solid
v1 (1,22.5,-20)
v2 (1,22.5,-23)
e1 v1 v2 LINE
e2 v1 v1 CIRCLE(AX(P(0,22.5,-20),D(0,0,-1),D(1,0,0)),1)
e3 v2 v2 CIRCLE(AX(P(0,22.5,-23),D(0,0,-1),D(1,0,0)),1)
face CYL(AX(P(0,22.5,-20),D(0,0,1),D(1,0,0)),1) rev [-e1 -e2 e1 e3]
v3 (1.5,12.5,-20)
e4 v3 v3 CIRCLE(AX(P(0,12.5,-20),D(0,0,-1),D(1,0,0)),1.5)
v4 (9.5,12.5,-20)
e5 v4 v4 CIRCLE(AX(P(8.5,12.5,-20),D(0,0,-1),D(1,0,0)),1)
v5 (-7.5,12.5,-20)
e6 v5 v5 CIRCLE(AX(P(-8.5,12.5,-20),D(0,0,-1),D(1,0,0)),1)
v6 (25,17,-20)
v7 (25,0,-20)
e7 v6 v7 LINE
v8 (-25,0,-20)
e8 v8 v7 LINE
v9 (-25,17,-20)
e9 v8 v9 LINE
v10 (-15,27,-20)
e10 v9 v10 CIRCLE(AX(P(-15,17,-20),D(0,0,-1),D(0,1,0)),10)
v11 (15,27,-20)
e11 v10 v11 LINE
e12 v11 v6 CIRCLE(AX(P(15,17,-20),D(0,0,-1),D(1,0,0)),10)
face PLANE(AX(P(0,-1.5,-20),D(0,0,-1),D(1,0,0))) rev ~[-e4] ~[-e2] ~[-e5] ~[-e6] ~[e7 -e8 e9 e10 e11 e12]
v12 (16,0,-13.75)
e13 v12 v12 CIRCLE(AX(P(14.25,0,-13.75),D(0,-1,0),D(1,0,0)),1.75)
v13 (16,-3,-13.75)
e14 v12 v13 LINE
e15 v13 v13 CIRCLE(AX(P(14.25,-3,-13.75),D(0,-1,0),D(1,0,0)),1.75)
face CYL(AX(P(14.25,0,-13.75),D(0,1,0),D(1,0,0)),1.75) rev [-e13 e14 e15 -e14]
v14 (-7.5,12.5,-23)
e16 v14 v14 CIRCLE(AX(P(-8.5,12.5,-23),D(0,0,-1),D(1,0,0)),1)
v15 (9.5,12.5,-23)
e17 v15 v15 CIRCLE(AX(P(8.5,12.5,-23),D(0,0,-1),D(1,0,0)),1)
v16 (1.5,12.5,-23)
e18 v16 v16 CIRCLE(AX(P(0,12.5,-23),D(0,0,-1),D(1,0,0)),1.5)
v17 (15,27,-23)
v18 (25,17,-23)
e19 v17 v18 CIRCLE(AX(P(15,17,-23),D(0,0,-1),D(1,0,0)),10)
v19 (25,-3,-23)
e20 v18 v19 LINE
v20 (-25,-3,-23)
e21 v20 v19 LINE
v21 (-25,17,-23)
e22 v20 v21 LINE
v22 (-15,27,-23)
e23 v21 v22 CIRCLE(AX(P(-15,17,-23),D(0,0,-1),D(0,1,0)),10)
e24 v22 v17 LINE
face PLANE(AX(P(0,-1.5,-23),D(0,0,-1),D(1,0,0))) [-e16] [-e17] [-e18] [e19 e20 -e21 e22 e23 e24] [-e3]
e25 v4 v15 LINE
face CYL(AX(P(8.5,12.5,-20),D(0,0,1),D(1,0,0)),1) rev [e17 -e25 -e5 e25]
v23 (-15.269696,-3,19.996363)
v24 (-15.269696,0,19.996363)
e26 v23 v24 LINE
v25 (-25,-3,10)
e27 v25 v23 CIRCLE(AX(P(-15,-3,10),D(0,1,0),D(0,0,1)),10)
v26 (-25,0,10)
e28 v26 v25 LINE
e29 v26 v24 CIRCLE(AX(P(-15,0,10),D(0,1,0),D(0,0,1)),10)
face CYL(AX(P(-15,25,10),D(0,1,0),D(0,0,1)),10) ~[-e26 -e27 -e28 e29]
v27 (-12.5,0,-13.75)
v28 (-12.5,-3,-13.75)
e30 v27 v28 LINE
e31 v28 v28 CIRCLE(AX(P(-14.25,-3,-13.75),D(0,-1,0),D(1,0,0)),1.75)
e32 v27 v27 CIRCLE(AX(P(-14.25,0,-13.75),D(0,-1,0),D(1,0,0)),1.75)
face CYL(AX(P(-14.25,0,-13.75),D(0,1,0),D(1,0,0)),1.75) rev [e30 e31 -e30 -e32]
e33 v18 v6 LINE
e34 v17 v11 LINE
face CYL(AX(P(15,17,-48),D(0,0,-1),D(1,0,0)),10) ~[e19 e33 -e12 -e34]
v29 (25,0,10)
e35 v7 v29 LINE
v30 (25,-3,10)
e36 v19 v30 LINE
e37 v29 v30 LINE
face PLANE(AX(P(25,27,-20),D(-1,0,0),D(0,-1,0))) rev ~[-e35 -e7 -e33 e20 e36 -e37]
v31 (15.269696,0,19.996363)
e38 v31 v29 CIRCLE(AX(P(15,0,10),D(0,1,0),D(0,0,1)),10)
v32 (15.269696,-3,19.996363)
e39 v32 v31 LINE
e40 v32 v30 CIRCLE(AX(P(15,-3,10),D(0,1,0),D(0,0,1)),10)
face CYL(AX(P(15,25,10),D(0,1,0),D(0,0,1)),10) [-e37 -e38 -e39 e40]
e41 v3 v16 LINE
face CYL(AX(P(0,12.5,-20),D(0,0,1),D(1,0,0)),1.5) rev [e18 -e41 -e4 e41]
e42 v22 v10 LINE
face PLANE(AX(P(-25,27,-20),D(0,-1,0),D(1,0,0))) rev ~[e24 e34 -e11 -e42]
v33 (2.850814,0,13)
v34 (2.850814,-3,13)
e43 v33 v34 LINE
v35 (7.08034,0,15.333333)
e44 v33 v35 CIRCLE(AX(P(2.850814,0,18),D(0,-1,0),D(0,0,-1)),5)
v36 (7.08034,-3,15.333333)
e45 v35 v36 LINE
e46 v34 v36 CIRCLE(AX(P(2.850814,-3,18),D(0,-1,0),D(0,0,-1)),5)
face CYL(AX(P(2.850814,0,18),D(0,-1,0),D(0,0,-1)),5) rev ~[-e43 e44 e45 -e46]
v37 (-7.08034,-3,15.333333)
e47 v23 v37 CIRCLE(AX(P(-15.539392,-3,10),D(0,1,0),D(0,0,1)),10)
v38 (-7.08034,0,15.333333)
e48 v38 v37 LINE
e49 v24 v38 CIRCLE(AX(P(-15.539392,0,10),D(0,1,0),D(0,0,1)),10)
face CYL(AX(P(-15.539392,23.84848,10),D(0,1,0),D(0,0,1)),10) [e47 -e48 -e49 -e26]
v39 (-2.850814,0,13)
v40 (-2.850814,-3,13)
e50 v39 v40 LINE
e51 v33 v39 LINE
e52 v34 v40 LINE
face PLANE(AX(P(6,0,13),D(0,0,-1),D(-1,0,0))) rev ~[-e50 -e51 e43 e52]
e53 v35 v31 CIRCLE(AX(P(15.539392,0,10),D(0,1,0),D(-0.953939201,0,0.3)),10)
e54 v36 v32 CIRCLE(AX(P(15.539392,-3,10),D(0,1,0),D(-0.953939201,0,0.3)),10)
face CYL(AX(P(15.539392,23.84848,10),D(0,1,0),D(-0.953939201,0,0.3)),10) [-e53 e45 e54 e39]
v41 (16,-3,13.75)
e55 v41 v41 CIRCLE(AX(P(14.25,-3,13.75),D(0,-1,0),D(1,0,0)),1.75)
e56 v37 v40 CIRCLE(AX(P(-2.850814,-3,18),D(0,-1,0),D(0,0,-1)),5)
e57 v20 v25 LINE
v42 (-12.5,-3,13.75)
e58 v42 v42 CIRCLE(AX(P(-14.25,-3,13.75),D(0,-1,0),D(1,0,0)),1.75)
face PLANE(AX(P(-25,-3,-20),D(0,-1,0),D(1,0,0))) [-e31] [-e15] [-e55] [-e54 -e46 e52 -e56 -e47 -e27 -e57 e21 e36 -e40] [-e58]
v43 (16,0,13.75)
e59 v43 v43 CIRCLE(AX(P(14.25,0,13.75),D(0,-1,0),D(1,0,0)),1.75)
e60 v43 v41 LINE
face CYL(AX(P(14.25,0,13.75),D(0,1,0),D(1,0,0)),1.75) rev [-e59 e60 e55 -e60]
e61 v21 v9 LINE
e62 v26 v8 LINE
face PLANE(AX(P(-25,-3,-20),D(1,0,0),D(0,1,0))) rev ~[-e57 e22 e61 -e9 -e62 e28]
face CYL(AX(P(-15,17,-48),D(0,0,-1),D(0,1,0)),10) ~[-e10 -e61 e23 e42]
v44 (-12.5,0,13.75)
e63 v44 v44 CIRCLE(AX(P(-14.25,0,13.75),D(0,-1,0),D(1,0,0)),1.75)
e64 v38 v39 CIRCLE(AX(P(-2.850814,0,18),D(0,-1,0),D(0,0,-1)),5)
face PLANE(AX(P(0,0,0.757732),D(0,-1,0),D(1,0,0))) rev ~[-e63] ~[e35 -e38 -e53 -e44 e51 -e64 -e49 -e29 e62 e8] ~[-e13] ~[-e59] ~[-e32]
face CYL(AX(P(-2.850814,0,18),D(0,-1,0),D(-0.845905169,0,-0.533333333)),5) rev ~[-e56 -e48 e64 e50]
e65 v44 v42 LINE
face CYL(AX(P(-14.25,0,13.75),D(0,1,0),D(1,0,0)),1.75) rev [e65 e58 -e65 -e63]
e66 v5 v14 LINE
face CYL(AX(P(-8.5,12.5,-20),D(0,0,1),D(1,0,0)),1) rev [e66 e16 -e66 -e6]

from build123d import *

# Parameters (mm, degrees)
F0_R        = 1.75
F1_DEPTH    = 3
F2_W        = 50
F2_H        = 3
F2_H_2      = 27
F2_R        = 1
F2_R_2      = 1.5
F3_DEPTH    = 3
F4_T1_DEPTH = 53
F4_T3_DEPTH = 53
F4_T5_DEPTH = 50.6969600708
F5_R        = 5


# Not quite as in the source:
# - a fillet or chamfer that OpenCascade refuses, or shapes differently, is made with other operations: its cross-section is extruded or revolved along the edge and cut away or added


with BuildPart() as f1:
    # F0 (on Front) → F1 (new body)
    with BuildSketch(Plane.XZ):
        Polygon((-6, 20), (-25, 20), (-25, -20), (25, -20), (25, 20), (6, 20), (6, 13), (-6, 13), align=None)
        with Locations((-14.25, -13.75)):
            Circle(F0_R, mode=Mode.SUBTRACT)
        with Locations((14.25, -13.75)):
            Circle(F0_R, mode=Mode.SUBTRACT)
        with Locations((-14.25, 13.75)):
            Circle(F0_R, mode=Mode.SUBTRACT)
        with Locations((14.25, 13.75)):
            Circle(F0_R, mode=Mode.SUBTRACT)
    extrude(amount=F1_DEPTH)

    # F2 (on face) → F3 (join)
    with BuildSketch(Plane(origin=(0, 0, -20), x_dir=(1, 0, 0), z_dir=(0, 0, -1))):
        with Locations((0, 1.5)):
            Rectangle(F2_W, F2_H)
        with Locations((0, -13.5)):
            Rectangle(F2_W, F2_H_2)
        with Locations((-8.5, -12.5)):
            Circle(F2_R, mode=Mode.SUBTRACT)
        with Locations((0, -22.5)):
            Circle(F2_R, mode=Mode.SUBTRACT)
        with Locations((0, -12.5)):
            Circle(F2_R_2, mode=Mode.SUBTRACT)
        with Locations((8.5, -12.5)):
            Circle(F2_R, mode=Mode.SUBTRACT)
    extrude(amount=F3_DEPTH)

    # F4: fillet of radius 10 on 6 edges, made by hand

    # F4_s2 → F4_t1 (cut)
    with BuildSketch(Plane.XY.offset(-48)):
        with BuildLine():
            ThreePointArc((25, 17), (22.0710678119, 24.0710678119), (15, 27))
            Line((15, 27), (25, 27))
            Line((25, 27), (25, 17))
        make_face()
        with BuildLine():
            ThreePointArc((-15, 27), (-22.0710678119, 24.0710678119), (-25, 17))
            Line((-25, 17), (-25, 27))
            Line((-25, 27), (-15, 27))
        make_face()
    extrude(amount=F4_T1_DEPTH, mode=Mode.SUBTRACT)

    # F4_s4 → F4_t3 (cut)
    with BuildSketch(Plane.XZ.offset(-25)):
        with BuildLine():
            ThreePointArc((-15, 20), (-22.0710678119, 17.0710678119), (-25, 10))
            Line((-25, 10), (-25, 20))
            Line((-25, 20), (-15, 20))
        make_face()
        with BuildLine():
            ThreePointArc((15, 20), (22.0710678119, 17.0710678119), (25, 10))
            Line((25, 10), (25, 20))
            Line((25, 20), (15, 20))
        make_face()
    extrude(amount=F4_T3_DEPTH, mode=Mode.SUBTRACT)

    # F4_s6 → F4_t5 (cut)
    with BuildSketch(Plane.XZ.offset(-23.8484800354)):
        with BuildLine():
            ThreePointArc((6, 13), (9.6233122311, 18.0622577483), (15.5393920142, 20))
            Line((15.5393920142, 20), (6, 20))
            Line((6, 20), (6, 13))
        make_face()
        with BuildLine():
            ThreePointArc((-15.5393920142, 20), (-9.6233122311, 18.0622577483), (-6, 13))
            Line((-6, 13), (-6, 20))
            Line((-6, 20), (-15.5393920142, 20))
        make_face()
    extrude(amount=F4_T5_DEPTH, mode=Mode.SUBTRACT)

    # F5
    f5_edges = [f1.edges().sort_by_distance(p)[0] for p in [
        (6, -1.5, 13),
        (-6, -1.5, 13),
    ]]
    fillet(f5_edges, radius=F5_R)


solid = f1.part
